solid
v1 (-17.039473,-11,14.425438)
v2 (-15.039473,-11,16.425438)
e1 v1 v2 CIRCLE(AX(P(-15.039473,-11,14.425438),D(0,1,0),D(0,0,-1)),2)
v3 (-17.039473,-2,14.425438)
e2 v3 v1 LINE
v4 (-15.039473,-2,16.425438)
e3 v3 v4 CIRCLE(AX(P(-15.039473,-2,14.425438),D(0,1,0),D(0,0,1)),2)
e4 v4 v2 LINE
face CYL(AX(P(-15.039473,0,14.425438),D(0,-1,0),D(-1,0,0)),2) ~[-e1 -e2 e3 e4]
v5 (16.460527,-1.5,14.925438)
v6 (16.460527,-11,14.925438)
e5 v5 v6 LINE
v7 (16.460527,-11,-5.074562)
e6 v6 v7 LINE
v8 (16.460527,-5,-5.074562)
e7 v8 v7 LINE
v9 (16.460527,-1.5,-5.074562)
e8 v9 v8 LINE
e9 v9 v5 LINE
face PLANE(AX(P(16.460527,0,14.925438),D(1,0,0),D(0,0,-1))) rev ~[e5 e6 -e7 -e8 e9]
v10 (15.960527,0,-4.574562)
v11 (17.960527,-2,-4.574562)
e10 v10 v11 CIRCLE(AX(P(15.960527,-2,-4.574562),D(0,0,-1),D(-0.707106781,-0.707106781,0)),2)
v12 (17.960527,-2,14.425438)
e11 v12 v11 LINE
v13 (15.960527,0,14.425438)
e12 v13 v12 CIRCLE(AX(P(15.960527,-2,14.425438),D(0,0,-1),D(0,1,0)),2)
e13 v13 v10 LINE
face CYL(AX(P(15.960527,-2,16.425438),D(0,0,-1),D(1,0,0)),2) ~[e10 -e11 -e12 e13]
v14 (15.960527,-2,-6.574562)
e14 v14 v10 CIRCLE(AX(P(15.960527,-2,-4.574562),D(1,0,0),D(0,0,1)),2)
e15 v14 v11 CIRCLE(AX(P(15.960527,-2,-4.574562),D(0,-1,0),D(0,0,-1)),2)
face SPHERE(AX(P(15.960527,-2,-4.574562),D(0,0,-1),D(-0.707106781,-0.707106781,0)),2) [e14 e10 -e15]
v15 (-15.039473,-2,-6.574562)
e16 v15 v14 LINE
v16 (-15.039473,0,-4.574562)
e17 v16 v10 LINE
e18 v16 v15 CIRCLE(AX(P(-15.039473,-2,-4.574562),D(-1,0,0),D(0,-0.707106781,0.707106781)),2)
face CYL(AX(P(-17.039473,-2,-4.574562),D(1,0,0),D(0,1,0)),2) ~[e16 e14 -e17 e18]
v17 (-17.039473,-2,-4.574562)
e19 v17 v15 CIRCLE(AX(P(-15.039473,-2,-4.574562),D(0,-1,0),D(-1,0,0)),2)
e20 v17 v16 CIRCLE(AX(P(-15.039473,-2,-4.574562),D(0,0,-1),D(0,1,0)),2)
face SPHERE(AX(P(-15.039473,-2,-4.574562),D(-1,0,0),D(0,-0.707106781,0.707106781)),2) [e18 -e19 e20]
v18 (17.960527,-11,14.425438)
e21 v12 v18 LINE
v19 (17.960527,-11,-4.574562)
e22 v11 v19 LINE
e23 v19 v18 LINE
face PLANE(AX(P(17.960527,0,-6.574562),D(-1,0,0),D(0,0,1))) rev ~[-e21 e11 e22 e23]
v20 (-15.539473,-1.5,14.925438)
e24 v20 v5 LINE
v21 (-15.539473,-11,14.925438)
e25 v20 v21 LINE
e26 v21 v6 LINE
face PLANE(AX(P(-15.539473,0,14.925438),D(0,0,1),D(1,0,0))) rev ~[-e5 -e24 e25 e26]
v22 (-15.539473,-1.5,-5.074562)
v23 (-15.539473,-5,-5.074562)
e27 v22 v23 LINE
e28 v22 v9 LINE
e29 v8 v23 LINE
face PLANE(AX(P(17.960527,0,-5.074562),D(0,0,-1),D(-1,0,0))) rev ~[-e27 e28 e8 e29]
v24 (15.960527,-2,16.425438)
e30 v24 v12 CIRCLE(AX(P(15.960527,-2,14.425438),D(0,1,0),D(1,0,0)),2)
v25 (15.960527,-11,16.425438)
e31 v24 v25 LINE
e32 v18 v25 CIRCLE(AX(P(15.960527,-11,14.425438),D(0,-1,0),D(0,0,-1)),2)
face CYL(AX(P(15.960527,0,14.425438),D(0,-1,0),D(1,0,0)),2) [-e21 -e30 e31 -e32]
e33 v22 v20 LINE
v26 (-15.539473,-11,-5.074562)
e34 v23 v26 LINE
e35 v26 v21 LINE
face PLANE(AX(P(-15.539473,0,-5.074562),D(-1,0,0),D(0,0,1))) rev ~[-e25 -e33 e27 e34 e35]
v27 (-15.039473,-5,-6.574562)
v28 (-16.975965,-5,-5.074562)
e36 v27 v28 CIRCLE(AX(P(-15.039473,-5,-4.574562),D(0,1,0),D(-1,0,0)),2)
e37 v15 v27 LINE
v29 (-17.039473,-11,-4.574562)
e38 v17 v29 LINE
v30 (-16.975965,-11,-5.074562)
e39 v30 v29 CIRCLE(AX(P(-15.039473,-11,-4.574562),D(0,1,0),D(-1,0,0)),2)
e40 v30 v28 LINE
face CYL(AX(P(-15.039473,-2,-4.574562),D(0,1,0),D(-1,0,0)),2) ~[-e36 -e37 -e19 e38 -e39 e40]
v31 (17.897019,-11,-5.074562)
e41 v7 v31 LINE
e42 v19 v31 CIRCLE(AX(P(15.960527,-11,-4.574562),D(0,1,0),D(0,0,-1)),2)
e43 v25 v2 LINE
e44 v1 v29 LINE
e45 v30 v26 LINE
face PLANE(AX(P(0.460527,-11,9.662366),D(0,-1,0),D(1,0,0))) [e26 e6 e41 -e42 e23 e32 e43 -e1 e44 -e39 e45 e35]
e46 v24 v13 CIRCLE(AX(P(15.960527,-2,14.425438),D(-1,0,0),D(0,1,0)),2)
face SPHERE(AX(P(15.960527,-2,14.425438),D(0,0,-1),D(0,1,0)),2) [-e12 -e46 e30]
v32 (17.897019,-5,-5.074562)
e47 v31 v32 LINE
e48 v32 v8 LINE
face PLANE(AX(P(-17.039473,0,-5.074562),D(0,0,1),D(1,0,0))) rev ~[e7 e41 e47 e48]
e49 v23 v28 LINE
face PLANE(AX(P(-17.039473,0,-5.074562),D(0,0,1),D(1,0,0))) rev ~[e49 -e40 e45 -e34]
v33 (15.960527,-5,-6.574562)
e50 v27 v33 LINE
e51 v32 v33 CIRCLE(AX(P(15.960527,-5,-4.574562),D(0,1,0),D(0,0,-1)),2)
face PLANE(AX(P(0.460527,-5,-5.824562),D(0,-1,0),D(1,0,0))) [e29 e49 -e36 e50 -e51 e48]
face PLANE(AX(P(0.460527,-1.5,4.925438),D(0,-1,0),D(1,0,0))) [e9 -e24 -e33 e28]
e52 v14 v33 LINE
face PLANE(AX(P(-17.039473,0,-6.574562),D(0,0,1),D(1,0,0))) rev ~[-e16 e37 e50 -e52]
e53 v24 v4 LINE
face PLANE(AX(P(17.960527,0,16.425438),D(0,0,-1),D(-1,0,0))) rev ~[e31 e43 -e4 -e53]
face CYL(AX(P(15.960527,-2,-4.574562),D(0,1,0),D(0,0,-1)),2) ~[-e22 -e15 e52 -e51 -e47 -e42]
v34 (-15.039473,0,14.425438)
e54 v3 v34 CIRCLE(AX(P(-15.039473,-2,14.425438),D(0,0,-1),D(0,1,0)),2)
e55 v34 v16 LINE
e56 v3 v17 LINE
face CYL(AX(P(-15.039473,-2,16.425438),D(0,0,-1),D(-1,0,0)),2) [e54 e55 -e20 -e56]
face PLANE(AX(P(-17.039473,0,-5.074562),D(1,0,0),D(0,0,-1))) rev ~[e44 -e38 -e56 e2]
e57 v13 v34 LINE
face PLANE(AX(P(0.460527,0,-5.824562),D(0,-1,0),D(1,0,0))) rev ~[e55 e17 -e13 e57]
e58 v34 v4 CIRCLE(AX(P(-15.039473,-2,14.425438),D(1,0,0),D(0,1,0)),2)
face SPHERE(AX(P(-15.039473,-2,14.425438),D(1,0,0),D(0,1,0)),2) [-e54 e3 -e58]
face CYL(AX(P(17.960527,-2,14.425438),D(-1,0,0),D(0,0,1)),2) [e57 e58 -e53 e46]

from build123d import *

# Parameters (mm, degrees)
F0_W         = 32
F0_H         = 20
F1_DEPTH     = 1.5
F2_DEPTH     = 11
F3_DEPTH     = 5
F4_R         = 2
F5_T1_DEPTH  = 15
F5_S5_W      = 2.04
F5_S5_H      = 2.04
F5_T6_DEPTH  = 2.04
F5_S11_W     = 2.04
F5_S11_H     = 2.04
F5_T12_DEPTH = 2.04


# Not quite as in the source:
# - a fillet or chamfer that OpenCascade refuses, or shapes differently, is made with other operations: its cross-section is extruded or revolved along the edge and cut away or added


with BuildPart() as f1:
    # F0 (on Front) → F1 (new body)
    with BuildSketch(Plane.XZ):
        with Locations((0.460526906, 4.9254382253)):
            Rectangle(F0_W, F0_H)
    extrude(amount=F1_DEPTH)

    # F0 (on Front) → F2 (join)
    with BuildSketch(Plane.XZ):
        Polygon((-15.539473094, -5.0745617747), (-15.539473094, 14.9254382253), (16.460526906, 14.9254382253), (16.460526906, -5.0745617747), (17.960526906, -5.0745617747), (17.960526906, 16.4254382253), (-17.039473094, 16.4254382253), (-17.039473094, -5.0745617747), align=None)
    extrude(amount=F2_DEPTH)

    # F0 (on Front) → F3 (join)
    with BuildSketch(Plane.XZ):
        Polygon((16.460526906, -5.0745617747), (-15.539473094, -5.0745617747), (-17.039473094, -5.0745617747), (-17.039473094, -6.5745617747), (17.960526906, -6.5745617747), (17.960526906, -5.0745617747), align=None)
    extrude(amount=F3_DEPTH)

    # F4
    f4_edges = [f1.edges().sort_by_distance(p)[0] for p in [
        (17.960527, 0, 4.925438),
        (0.460527, 0, 16.425438),
        (-17.039473, 0, 4.925438),
        (0.460527, 0, -6.574562),
        (17.960527, -5.5, 16.425438),
        (-17.039473, -5.5, 16.425438),
    ]]
    fillet(f4_edges, radius=F4_R)

    # F5: fillet of radius 2 on 2 edges, made by hand

    # F5_s2 → F5_t1 (cut)
    with BuildSketch(Plane.XZ.offset(2)):
        with BuildLine():
            ThreePointArc((-17.039473094, -4.5745617747), (-16.4536866564, -5.9887753371), (-15.039473094, -6.5745617747))
            Line((-15.039473094, -6.5745617747), (-15.039473094, -6.6145617747))
            Line((-15.039473094, -6.6145617747), (-17.079473094, -6.6145617747))
            Line((-17.079473094, -6.6145617747), (-17.079473094, -4.5745617747))
            Line((-17.079473094, -4.5745617747), (-17.039473094, -4.5745617747))
        make_face()
        with BuildLine():
            ThreePointArc((15.960526906, -6.5745617747), (17.3747404683, -5.9887753371), (17.960526906, -4.5745617747))
            Line((17.960526906, -4.5745617747), (18.000526906, -4.5745617747))
            Line((18.000526906, -4.5745617747), (18.000526906, -6.6145617747))
            Line((18.000526906, -6.6145617747), (15.960526906, -6.6145617747))
            Line((15.960526906, -6.6145617747), (15.960526906, -6.5745617747))
        make_face()
    extrude(amount=F5_T1_DEPTH, mode=Mode.SUBTRACT)


with BuildPart() as f5_tool4:
    # F5_s5 → F5_t6 (new body)
    with BuildSketch(Plane.XY.offset(-4.5745617747)):
        with Locations((16.980526906, -0.98)):
            Rectangle(F5_S5_W, F5_S5_H)
    extrude(amount=-F5_T6_DEPTH)

    # F5_s7 → F5_t8 (revolve, cut)
    with BuildSketch(Plane(origin=(15.960526906, -2, -4.5745617747), x_dir=(-0.7071067812, -0.7071067812, 0), z_dir=(0.7071067812, -0.7071067812, 0))):
        with BuildLine():
            ThreePointArc((0, -2), (2, 0), (0, 2))
            Line((0, 2), (0, -2))
        make_face()
    revolve(axis=Axis((15.960526906, -2, -4.5745617747), (0, 0, -1)), mode=Mode.SUBTRACT)


with BuildPart() as f1_1:
    add(f1.part)

    # F5_t3: cut F5_tool4
    add(f5_tool4.part, mode=Mode.SUBTRACT)


with BuildPart() as f5_tool10:
    # F5_s11 → F5_t12 (new body)
    with BuildSketch(Plane.YZ.offset(-15.039473094)):
        with Locations((-0.98, -5.5945617747)):
            Rectangle(F5_S11_W, F5_S11_H)
    extrude(amount=-F5_T12_DEPTH)

    # F5_s13 → F5_t14 (revolve, cut)
    with BuildSketch(Plane(origin=(-15.039473094, -2, -4.5745617747), x_dir=(0, -0.7071067812, 0.7071067812), z_dir=(0, -0.7071067812, -0.7071067812))):
        with BuildLine():
            ThreePointArc((0, -2), (2, 0), (0, 2))
            Line((0, 2), (0, -2))
        make_face()
    revolve(axis=Axis((-15.039473094, -2, -4.5745617747), (-1, 0, 0)), mode=Mode.SUBTRACT)


with BuildPart() as f1_2:
    add(f1_1.part)

    # F5_t9: cut F5_tool10
    add(f5_tool10.part, mode=Mode.SUBTRACT)


solid = f1_2.part
